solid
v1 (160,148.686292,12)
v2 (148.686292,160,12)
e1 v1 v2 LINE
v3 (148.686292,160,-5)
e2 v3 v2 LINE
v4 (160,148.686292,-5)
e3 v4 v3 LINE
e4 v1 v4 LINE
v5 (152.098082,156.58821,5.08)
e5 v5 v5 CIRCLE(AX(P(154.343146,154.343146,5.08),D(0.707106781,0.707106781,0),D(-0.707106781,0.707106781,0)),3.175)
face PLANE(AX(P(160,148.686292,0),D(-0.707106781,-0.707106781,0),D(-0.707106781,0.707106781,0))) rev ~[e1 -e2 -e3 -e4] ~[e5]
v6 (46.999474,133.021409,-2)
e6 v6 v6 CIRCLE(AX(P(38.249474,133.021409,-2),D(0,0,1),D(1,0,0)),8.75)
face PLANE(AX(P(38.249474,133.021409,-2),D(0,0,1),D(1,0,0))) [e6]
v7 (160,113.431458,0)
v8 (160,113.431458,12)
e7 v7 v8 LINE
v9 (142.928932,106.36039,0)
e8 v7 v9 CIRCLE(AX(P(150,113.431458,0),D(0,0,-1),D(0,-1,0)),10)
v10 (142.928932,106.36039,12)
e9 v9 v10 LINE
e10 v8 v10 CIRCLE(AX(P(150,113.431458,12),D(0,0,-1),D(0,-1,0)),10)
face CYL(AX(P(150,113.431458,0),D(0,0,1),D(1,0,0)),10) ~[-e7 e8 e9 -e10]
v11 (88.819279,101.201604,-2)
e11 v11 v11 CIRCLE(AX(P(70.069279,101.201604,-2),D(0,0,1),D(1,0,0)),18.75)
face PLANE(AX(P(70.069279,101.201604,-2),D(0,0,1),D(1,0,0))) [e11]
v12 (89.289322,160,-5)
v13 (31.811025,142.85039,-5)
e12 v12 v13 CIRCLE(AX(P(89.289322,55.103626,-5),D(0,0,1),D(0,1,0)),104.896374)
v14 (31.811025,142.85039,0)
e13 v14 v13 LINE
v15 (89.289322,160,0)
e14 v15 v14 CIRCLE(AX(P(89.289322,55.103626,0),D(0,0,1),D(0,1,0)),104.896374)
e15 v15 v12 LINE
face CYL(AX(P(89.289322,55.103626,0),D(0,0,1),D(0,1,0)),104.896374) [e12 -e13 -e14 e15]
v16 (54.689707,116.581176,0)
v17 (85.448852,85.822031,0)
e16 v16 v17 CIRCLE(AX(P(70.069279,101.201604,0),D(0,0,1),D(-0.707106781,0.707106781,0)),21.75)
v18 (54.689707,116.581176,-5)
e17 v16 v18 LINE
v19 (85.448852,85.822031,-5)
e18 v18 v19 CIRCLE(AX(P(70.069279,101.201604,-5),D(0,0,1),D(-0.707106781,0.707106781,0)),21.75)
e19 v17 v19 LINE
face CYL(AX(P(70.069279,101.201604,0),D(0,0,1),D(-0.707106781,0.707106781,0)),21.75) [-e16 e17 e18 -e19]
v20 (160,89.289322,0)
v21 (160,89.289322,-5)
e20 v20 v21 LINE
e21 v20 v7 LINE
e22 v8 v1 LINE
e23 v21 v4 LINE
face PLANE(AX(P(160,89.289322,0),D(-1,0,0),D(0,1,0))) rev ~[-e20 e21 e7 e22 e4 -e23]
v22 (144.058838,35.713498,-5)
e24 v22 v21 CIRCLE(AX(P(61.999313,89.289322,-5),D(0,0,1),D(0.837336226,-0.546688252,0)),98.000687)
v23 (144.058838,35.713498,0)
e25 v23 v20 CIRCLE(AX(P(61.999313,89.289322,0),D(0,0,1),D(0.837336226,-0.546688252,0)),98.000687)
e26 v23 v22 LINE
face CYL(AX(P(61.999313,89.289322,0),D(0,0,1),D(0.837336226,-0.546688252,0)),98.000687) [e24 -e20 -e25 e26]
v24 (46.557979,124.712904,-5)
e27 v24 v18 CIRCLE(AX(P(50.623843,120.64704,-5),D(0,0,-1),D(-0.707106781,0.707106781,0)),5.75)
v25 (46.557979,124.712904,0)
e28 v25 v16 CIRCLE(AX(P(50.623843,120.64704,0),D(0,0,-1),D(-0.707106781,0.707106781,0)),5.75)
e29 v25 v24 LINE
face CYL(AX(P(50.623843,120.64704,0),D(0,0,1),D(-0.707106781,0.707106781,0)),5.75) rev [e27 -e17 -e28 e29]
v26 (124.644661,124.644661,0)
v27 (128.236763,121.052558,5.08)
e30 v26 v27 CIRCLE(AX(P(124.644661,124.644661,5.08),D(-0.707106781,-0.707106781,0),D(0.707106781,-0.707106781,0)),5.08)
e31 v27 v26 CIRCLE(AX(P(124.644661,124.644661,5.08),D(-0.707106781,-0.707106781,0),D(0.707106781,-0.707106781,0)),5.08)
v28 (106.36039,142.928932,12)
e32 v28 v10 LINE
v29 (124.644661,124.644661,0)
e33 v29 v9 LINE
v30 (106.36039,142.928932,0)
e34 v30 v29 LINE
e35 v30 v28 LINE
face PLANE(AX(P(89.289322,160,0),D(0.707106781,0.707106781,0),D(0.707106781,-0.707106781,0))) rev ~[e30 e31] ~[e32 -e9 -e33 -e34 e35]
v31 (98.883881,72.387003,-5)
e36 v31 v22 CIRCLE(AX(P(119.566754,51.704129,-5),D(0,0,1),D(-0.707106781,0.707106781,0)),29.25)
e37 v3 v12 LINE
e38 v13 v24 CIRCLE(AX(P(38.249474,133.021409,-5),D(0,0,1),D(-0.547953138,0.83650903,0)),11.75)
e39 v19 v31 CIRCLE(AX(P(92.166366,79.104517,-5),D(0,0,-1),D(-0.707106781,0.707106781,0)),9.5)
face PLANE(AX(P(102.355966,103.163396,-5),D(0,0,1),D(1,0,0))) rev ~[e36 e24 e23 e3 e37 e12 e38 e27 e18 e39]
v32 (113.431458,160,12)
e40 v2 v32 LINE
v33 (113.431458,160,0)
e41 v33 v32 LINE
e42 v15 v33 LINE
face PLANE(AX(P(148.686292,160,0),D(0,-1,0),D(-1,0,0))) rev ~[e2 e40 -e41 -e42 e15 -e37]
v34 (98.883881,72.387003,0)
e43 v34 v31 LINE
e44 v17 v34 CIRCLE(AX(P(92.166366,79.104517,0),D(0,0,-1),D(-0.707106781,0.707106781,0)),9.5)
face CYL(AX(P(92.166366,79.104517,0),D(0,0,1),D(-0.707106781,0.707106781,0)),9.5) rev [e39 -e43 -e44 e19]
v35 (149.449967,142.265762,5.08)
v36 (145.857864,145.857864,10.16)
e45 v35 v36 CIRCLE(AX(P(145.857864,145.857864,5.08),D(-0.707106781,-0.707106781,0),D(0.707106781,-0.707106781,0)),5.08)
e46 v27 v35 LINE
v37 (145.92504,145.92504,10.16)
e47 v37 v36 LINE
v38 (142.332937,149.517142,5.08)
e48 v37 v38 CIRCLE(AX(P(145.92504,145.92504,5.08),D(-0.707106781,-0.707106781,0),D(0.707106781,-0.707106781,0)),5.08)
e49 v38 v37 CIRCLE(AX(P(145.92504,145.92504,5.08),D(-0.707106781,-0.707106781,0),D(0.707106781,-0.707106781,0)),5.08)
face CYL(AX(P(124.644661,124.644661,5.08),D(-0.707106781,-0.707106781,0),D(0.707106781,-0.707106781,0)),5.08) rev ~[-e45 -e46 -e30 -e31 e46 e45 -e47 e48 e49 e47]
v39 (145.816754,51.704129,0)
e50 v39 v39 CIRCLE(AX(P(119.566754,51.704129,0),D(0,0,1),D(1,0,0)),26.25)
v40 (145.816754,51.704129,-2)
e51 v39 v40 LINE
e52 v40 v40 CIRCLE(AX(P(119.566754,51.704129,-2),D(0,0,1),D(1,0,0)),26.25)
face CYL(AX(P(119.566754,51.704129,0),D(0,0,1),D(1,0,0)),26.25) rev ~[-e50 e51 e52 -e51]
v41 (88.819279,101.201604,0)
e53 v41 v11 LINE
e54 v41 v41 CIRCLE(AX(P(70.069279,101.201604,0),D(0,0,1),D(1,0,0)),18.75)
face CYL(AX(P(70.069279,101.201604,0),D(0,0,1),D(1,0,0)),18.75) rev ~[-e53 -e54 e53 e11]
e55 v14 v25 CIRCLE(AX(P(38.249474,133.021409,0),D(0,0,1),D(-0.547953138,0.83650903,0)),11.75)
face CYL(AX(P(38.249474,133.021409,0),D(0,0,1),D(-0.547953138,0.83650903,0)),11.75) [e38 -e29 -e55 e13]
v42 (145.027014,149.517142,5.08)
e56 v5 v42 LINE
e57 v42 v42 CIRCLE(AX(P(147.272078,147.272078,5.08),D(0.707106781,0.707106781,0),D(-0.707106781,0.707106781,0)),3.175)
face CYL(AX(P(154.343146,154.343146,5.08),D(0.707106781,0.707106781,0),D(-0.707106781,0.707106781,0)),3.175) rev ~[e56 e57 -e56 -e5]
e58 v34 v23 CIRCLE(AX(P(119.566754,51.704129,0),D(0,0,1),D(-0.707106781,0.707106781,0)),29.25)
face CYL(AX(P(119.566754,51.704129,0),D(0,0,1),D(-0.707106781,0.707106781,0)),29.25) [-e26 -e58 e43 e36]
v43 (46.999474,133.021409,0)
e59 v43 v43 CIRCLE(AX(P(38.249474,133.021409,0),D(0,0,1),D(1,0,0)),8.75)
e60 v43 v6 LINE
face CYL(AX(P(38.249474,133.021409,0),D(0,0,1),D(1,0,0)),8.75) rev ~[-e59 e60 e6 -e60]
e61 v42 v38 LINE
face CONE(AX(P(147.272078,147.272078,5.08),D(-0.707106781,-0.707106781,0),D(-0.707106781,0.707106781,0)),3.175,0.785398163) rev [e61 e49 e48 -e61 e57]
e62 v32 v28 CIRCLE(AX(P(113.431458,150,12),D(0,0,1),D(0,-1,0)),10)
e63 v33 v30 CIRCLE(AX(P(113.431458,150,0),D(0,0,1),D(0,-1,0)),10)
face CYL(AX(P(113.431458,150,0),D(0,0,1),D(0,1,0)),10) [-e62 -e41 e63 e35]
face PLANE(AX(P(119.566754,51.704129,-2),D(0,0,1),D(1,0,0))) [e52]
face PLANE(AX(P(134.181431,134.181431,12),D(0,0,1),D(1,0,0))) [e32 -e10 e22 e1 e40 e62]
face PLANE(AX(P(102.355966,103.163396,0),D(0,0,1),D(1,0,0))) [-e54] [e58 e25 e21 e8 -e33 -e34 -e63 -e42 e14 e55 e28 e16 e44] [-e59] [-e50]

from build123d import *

# Parameters (mm, degrees)
F1_DEPTH     = 5
F2_R         = 8.75
F2_R_2       = 18.75
F2_R_3       = 26.25
F3_DEPTH     = 2
F5_DEPTH     = 12
F6_R         = 3.175
F7_DEPTH     = 183.6597451804
F8_R         = 5.08
F9_DEPTH     = 30
F10_S5_R     = 5.08
F10_T6_DEPTH = 9
F11_R        = 10


# Not quite as in the source:
# - a fillet or chamfer that OpenCascade refuses, or shapes differently, is made with other operations: its cross-section is extruded or revolved along the edge and cut away or added


with BuildPart() as f1:
    # F0 (on Top) → F1 (new body)
    with BuildSketch(Plane.XY):
        with BuildLine():
            ThreePointArc((89.2893218813, 160), (59.2982241526, 155.6212032378), (31.8110246399, 142.8503901468))
            ThreePointArc((31.8110246399, 142.8503901468), (29.1326558006, 125.6088436513), (46.5579786953, 124.7129043596))
            ThreePointArc((46.5579786953, 124.7129043596), (54.6897066789, 124.7129043596), (54.6897066789, 116.581176376))
            ThreePointArc((54.6897066789, 116.581176376), (54.6897066789, 85.8220313944), (85.4488516605, 85.8220313944))
            ThreePointArc((85.4488516605, 85.8220313944), (98.8838805031, 85.8220313944), (98.8838805031, 72.3870025518))
            ThreePointArc((98.8838805031, 72.3870025518), (101.1313528665, 28.995133397), (144.0588384666, 35.7134978428))
            ThreePointArc((144.0588384666, 35.7134978428), (155.9302038799, 61.3407550467), (160, 89.2893218813))
            Line((160, 89.2893218813), (160, 148.686291501))
            Line((160, 148.686291501), (148.686291501, 160))
            Line((148.686291501, 160), (89.2893218813, 160))
        make_face()
    extrude(amount=-F1_DEPTH)

    # F2 (on Top) → F3 (cut)
    with BuildSketch(Plane.XY):
        with Locations((38.2494740163, 133.0214090386)):
            Circle(F2_R)
        with Locations((70.0692791697, 101.2016038852)):
            Circle(F2_R_2)
        with Locations((119.5667538528, 51.7041292021)):
            Circle(F2_R_3)
    extrude(amount=-F3_DEPTH, mode=Mode.SUBTRACT)

    # F4 (on Top) → F5 (join)
    with BuildSketch(Plane.XY):
        Polygon((160, 148.686291501), (148.686291501, 160), (89.2893218813, 160), (160, 89.2893218813), align=None)
    extrude(amount=F5_DEPTH)

    # F6 (on face) → F7 (cut, through all)
    with BuildSketch(Plane(origin=(154.3431457505, 154.3431457505, 0), x_dir=(-0.7071067812, 0.7071067812, 0), z_dir=(0.7071067812, 0.7071067812, 0))):
        with Locations((0, 5.08)):
            Circle(F6_R)
    extrude(amount=-F7_DEPTH, mode=Mode.SUBTRACT)

    # F8 (on face) → F9 (cut)
    with BuildSketch(Plane(origin=(124.6446609407, 124.6446609407, 0), x_dir=(0.7071067812, -0.7071067812, 0), z_dir=(-0.7071067812, -0.7071067812, 0))):
        with Locations((0, 5.08)):
            Circle(F8_R)
    extrude(amount=-F9_DEPTH, mode=Mode.SUBTRACT)

    # F10: chamfer of 2 on 1 edges, made by hand


with BuildPart() as f10_tool2:
    # F10_s3 → F10_t4 (revolve)
    with BuildSketch(Plane.XY.offset(5.08)):
        Polygon((145.0270139084, 149.5171419689), (142.1985867836, 149.5171419689), (143.612800346, 148.1029284065), align=None)
    revolve(axis=Axis((145.8578643763, 145.8578643763, 5.08), (0.7071067812, 0.7071067812, 0)))

    # F10_s5 → F10_t6 (intersect, symmetric)
    with BuildSketch(Plane(origin=(145.8761289588, 145.8761289588, 0), x_dir=(0, 0, 1), z_dir=(-0.7071067812, -0.7071067812, 0))):
        with Locations((5.08, 0)):
            Circle(F10_S5_R)
    extrude(amount=F10_T6_DEPTH, both=True, mode=Mode.INTERSECT)


with BuildPart() as f1_1:
    add(f1.part)

    # F10_t1: cut F10_tool2
    add(f10_tool2.part, mode=Mode.SUBTRACT)

    # F11
    f11_edges = [f1_1.edges().sort_by_distance(p)[0] for p in [
        (160, 89.289322, 6),
        (89.289322, 160, 6),
    ]]
    fillet(f11_edges, radius=F11_R)


solid = f1_1.part
